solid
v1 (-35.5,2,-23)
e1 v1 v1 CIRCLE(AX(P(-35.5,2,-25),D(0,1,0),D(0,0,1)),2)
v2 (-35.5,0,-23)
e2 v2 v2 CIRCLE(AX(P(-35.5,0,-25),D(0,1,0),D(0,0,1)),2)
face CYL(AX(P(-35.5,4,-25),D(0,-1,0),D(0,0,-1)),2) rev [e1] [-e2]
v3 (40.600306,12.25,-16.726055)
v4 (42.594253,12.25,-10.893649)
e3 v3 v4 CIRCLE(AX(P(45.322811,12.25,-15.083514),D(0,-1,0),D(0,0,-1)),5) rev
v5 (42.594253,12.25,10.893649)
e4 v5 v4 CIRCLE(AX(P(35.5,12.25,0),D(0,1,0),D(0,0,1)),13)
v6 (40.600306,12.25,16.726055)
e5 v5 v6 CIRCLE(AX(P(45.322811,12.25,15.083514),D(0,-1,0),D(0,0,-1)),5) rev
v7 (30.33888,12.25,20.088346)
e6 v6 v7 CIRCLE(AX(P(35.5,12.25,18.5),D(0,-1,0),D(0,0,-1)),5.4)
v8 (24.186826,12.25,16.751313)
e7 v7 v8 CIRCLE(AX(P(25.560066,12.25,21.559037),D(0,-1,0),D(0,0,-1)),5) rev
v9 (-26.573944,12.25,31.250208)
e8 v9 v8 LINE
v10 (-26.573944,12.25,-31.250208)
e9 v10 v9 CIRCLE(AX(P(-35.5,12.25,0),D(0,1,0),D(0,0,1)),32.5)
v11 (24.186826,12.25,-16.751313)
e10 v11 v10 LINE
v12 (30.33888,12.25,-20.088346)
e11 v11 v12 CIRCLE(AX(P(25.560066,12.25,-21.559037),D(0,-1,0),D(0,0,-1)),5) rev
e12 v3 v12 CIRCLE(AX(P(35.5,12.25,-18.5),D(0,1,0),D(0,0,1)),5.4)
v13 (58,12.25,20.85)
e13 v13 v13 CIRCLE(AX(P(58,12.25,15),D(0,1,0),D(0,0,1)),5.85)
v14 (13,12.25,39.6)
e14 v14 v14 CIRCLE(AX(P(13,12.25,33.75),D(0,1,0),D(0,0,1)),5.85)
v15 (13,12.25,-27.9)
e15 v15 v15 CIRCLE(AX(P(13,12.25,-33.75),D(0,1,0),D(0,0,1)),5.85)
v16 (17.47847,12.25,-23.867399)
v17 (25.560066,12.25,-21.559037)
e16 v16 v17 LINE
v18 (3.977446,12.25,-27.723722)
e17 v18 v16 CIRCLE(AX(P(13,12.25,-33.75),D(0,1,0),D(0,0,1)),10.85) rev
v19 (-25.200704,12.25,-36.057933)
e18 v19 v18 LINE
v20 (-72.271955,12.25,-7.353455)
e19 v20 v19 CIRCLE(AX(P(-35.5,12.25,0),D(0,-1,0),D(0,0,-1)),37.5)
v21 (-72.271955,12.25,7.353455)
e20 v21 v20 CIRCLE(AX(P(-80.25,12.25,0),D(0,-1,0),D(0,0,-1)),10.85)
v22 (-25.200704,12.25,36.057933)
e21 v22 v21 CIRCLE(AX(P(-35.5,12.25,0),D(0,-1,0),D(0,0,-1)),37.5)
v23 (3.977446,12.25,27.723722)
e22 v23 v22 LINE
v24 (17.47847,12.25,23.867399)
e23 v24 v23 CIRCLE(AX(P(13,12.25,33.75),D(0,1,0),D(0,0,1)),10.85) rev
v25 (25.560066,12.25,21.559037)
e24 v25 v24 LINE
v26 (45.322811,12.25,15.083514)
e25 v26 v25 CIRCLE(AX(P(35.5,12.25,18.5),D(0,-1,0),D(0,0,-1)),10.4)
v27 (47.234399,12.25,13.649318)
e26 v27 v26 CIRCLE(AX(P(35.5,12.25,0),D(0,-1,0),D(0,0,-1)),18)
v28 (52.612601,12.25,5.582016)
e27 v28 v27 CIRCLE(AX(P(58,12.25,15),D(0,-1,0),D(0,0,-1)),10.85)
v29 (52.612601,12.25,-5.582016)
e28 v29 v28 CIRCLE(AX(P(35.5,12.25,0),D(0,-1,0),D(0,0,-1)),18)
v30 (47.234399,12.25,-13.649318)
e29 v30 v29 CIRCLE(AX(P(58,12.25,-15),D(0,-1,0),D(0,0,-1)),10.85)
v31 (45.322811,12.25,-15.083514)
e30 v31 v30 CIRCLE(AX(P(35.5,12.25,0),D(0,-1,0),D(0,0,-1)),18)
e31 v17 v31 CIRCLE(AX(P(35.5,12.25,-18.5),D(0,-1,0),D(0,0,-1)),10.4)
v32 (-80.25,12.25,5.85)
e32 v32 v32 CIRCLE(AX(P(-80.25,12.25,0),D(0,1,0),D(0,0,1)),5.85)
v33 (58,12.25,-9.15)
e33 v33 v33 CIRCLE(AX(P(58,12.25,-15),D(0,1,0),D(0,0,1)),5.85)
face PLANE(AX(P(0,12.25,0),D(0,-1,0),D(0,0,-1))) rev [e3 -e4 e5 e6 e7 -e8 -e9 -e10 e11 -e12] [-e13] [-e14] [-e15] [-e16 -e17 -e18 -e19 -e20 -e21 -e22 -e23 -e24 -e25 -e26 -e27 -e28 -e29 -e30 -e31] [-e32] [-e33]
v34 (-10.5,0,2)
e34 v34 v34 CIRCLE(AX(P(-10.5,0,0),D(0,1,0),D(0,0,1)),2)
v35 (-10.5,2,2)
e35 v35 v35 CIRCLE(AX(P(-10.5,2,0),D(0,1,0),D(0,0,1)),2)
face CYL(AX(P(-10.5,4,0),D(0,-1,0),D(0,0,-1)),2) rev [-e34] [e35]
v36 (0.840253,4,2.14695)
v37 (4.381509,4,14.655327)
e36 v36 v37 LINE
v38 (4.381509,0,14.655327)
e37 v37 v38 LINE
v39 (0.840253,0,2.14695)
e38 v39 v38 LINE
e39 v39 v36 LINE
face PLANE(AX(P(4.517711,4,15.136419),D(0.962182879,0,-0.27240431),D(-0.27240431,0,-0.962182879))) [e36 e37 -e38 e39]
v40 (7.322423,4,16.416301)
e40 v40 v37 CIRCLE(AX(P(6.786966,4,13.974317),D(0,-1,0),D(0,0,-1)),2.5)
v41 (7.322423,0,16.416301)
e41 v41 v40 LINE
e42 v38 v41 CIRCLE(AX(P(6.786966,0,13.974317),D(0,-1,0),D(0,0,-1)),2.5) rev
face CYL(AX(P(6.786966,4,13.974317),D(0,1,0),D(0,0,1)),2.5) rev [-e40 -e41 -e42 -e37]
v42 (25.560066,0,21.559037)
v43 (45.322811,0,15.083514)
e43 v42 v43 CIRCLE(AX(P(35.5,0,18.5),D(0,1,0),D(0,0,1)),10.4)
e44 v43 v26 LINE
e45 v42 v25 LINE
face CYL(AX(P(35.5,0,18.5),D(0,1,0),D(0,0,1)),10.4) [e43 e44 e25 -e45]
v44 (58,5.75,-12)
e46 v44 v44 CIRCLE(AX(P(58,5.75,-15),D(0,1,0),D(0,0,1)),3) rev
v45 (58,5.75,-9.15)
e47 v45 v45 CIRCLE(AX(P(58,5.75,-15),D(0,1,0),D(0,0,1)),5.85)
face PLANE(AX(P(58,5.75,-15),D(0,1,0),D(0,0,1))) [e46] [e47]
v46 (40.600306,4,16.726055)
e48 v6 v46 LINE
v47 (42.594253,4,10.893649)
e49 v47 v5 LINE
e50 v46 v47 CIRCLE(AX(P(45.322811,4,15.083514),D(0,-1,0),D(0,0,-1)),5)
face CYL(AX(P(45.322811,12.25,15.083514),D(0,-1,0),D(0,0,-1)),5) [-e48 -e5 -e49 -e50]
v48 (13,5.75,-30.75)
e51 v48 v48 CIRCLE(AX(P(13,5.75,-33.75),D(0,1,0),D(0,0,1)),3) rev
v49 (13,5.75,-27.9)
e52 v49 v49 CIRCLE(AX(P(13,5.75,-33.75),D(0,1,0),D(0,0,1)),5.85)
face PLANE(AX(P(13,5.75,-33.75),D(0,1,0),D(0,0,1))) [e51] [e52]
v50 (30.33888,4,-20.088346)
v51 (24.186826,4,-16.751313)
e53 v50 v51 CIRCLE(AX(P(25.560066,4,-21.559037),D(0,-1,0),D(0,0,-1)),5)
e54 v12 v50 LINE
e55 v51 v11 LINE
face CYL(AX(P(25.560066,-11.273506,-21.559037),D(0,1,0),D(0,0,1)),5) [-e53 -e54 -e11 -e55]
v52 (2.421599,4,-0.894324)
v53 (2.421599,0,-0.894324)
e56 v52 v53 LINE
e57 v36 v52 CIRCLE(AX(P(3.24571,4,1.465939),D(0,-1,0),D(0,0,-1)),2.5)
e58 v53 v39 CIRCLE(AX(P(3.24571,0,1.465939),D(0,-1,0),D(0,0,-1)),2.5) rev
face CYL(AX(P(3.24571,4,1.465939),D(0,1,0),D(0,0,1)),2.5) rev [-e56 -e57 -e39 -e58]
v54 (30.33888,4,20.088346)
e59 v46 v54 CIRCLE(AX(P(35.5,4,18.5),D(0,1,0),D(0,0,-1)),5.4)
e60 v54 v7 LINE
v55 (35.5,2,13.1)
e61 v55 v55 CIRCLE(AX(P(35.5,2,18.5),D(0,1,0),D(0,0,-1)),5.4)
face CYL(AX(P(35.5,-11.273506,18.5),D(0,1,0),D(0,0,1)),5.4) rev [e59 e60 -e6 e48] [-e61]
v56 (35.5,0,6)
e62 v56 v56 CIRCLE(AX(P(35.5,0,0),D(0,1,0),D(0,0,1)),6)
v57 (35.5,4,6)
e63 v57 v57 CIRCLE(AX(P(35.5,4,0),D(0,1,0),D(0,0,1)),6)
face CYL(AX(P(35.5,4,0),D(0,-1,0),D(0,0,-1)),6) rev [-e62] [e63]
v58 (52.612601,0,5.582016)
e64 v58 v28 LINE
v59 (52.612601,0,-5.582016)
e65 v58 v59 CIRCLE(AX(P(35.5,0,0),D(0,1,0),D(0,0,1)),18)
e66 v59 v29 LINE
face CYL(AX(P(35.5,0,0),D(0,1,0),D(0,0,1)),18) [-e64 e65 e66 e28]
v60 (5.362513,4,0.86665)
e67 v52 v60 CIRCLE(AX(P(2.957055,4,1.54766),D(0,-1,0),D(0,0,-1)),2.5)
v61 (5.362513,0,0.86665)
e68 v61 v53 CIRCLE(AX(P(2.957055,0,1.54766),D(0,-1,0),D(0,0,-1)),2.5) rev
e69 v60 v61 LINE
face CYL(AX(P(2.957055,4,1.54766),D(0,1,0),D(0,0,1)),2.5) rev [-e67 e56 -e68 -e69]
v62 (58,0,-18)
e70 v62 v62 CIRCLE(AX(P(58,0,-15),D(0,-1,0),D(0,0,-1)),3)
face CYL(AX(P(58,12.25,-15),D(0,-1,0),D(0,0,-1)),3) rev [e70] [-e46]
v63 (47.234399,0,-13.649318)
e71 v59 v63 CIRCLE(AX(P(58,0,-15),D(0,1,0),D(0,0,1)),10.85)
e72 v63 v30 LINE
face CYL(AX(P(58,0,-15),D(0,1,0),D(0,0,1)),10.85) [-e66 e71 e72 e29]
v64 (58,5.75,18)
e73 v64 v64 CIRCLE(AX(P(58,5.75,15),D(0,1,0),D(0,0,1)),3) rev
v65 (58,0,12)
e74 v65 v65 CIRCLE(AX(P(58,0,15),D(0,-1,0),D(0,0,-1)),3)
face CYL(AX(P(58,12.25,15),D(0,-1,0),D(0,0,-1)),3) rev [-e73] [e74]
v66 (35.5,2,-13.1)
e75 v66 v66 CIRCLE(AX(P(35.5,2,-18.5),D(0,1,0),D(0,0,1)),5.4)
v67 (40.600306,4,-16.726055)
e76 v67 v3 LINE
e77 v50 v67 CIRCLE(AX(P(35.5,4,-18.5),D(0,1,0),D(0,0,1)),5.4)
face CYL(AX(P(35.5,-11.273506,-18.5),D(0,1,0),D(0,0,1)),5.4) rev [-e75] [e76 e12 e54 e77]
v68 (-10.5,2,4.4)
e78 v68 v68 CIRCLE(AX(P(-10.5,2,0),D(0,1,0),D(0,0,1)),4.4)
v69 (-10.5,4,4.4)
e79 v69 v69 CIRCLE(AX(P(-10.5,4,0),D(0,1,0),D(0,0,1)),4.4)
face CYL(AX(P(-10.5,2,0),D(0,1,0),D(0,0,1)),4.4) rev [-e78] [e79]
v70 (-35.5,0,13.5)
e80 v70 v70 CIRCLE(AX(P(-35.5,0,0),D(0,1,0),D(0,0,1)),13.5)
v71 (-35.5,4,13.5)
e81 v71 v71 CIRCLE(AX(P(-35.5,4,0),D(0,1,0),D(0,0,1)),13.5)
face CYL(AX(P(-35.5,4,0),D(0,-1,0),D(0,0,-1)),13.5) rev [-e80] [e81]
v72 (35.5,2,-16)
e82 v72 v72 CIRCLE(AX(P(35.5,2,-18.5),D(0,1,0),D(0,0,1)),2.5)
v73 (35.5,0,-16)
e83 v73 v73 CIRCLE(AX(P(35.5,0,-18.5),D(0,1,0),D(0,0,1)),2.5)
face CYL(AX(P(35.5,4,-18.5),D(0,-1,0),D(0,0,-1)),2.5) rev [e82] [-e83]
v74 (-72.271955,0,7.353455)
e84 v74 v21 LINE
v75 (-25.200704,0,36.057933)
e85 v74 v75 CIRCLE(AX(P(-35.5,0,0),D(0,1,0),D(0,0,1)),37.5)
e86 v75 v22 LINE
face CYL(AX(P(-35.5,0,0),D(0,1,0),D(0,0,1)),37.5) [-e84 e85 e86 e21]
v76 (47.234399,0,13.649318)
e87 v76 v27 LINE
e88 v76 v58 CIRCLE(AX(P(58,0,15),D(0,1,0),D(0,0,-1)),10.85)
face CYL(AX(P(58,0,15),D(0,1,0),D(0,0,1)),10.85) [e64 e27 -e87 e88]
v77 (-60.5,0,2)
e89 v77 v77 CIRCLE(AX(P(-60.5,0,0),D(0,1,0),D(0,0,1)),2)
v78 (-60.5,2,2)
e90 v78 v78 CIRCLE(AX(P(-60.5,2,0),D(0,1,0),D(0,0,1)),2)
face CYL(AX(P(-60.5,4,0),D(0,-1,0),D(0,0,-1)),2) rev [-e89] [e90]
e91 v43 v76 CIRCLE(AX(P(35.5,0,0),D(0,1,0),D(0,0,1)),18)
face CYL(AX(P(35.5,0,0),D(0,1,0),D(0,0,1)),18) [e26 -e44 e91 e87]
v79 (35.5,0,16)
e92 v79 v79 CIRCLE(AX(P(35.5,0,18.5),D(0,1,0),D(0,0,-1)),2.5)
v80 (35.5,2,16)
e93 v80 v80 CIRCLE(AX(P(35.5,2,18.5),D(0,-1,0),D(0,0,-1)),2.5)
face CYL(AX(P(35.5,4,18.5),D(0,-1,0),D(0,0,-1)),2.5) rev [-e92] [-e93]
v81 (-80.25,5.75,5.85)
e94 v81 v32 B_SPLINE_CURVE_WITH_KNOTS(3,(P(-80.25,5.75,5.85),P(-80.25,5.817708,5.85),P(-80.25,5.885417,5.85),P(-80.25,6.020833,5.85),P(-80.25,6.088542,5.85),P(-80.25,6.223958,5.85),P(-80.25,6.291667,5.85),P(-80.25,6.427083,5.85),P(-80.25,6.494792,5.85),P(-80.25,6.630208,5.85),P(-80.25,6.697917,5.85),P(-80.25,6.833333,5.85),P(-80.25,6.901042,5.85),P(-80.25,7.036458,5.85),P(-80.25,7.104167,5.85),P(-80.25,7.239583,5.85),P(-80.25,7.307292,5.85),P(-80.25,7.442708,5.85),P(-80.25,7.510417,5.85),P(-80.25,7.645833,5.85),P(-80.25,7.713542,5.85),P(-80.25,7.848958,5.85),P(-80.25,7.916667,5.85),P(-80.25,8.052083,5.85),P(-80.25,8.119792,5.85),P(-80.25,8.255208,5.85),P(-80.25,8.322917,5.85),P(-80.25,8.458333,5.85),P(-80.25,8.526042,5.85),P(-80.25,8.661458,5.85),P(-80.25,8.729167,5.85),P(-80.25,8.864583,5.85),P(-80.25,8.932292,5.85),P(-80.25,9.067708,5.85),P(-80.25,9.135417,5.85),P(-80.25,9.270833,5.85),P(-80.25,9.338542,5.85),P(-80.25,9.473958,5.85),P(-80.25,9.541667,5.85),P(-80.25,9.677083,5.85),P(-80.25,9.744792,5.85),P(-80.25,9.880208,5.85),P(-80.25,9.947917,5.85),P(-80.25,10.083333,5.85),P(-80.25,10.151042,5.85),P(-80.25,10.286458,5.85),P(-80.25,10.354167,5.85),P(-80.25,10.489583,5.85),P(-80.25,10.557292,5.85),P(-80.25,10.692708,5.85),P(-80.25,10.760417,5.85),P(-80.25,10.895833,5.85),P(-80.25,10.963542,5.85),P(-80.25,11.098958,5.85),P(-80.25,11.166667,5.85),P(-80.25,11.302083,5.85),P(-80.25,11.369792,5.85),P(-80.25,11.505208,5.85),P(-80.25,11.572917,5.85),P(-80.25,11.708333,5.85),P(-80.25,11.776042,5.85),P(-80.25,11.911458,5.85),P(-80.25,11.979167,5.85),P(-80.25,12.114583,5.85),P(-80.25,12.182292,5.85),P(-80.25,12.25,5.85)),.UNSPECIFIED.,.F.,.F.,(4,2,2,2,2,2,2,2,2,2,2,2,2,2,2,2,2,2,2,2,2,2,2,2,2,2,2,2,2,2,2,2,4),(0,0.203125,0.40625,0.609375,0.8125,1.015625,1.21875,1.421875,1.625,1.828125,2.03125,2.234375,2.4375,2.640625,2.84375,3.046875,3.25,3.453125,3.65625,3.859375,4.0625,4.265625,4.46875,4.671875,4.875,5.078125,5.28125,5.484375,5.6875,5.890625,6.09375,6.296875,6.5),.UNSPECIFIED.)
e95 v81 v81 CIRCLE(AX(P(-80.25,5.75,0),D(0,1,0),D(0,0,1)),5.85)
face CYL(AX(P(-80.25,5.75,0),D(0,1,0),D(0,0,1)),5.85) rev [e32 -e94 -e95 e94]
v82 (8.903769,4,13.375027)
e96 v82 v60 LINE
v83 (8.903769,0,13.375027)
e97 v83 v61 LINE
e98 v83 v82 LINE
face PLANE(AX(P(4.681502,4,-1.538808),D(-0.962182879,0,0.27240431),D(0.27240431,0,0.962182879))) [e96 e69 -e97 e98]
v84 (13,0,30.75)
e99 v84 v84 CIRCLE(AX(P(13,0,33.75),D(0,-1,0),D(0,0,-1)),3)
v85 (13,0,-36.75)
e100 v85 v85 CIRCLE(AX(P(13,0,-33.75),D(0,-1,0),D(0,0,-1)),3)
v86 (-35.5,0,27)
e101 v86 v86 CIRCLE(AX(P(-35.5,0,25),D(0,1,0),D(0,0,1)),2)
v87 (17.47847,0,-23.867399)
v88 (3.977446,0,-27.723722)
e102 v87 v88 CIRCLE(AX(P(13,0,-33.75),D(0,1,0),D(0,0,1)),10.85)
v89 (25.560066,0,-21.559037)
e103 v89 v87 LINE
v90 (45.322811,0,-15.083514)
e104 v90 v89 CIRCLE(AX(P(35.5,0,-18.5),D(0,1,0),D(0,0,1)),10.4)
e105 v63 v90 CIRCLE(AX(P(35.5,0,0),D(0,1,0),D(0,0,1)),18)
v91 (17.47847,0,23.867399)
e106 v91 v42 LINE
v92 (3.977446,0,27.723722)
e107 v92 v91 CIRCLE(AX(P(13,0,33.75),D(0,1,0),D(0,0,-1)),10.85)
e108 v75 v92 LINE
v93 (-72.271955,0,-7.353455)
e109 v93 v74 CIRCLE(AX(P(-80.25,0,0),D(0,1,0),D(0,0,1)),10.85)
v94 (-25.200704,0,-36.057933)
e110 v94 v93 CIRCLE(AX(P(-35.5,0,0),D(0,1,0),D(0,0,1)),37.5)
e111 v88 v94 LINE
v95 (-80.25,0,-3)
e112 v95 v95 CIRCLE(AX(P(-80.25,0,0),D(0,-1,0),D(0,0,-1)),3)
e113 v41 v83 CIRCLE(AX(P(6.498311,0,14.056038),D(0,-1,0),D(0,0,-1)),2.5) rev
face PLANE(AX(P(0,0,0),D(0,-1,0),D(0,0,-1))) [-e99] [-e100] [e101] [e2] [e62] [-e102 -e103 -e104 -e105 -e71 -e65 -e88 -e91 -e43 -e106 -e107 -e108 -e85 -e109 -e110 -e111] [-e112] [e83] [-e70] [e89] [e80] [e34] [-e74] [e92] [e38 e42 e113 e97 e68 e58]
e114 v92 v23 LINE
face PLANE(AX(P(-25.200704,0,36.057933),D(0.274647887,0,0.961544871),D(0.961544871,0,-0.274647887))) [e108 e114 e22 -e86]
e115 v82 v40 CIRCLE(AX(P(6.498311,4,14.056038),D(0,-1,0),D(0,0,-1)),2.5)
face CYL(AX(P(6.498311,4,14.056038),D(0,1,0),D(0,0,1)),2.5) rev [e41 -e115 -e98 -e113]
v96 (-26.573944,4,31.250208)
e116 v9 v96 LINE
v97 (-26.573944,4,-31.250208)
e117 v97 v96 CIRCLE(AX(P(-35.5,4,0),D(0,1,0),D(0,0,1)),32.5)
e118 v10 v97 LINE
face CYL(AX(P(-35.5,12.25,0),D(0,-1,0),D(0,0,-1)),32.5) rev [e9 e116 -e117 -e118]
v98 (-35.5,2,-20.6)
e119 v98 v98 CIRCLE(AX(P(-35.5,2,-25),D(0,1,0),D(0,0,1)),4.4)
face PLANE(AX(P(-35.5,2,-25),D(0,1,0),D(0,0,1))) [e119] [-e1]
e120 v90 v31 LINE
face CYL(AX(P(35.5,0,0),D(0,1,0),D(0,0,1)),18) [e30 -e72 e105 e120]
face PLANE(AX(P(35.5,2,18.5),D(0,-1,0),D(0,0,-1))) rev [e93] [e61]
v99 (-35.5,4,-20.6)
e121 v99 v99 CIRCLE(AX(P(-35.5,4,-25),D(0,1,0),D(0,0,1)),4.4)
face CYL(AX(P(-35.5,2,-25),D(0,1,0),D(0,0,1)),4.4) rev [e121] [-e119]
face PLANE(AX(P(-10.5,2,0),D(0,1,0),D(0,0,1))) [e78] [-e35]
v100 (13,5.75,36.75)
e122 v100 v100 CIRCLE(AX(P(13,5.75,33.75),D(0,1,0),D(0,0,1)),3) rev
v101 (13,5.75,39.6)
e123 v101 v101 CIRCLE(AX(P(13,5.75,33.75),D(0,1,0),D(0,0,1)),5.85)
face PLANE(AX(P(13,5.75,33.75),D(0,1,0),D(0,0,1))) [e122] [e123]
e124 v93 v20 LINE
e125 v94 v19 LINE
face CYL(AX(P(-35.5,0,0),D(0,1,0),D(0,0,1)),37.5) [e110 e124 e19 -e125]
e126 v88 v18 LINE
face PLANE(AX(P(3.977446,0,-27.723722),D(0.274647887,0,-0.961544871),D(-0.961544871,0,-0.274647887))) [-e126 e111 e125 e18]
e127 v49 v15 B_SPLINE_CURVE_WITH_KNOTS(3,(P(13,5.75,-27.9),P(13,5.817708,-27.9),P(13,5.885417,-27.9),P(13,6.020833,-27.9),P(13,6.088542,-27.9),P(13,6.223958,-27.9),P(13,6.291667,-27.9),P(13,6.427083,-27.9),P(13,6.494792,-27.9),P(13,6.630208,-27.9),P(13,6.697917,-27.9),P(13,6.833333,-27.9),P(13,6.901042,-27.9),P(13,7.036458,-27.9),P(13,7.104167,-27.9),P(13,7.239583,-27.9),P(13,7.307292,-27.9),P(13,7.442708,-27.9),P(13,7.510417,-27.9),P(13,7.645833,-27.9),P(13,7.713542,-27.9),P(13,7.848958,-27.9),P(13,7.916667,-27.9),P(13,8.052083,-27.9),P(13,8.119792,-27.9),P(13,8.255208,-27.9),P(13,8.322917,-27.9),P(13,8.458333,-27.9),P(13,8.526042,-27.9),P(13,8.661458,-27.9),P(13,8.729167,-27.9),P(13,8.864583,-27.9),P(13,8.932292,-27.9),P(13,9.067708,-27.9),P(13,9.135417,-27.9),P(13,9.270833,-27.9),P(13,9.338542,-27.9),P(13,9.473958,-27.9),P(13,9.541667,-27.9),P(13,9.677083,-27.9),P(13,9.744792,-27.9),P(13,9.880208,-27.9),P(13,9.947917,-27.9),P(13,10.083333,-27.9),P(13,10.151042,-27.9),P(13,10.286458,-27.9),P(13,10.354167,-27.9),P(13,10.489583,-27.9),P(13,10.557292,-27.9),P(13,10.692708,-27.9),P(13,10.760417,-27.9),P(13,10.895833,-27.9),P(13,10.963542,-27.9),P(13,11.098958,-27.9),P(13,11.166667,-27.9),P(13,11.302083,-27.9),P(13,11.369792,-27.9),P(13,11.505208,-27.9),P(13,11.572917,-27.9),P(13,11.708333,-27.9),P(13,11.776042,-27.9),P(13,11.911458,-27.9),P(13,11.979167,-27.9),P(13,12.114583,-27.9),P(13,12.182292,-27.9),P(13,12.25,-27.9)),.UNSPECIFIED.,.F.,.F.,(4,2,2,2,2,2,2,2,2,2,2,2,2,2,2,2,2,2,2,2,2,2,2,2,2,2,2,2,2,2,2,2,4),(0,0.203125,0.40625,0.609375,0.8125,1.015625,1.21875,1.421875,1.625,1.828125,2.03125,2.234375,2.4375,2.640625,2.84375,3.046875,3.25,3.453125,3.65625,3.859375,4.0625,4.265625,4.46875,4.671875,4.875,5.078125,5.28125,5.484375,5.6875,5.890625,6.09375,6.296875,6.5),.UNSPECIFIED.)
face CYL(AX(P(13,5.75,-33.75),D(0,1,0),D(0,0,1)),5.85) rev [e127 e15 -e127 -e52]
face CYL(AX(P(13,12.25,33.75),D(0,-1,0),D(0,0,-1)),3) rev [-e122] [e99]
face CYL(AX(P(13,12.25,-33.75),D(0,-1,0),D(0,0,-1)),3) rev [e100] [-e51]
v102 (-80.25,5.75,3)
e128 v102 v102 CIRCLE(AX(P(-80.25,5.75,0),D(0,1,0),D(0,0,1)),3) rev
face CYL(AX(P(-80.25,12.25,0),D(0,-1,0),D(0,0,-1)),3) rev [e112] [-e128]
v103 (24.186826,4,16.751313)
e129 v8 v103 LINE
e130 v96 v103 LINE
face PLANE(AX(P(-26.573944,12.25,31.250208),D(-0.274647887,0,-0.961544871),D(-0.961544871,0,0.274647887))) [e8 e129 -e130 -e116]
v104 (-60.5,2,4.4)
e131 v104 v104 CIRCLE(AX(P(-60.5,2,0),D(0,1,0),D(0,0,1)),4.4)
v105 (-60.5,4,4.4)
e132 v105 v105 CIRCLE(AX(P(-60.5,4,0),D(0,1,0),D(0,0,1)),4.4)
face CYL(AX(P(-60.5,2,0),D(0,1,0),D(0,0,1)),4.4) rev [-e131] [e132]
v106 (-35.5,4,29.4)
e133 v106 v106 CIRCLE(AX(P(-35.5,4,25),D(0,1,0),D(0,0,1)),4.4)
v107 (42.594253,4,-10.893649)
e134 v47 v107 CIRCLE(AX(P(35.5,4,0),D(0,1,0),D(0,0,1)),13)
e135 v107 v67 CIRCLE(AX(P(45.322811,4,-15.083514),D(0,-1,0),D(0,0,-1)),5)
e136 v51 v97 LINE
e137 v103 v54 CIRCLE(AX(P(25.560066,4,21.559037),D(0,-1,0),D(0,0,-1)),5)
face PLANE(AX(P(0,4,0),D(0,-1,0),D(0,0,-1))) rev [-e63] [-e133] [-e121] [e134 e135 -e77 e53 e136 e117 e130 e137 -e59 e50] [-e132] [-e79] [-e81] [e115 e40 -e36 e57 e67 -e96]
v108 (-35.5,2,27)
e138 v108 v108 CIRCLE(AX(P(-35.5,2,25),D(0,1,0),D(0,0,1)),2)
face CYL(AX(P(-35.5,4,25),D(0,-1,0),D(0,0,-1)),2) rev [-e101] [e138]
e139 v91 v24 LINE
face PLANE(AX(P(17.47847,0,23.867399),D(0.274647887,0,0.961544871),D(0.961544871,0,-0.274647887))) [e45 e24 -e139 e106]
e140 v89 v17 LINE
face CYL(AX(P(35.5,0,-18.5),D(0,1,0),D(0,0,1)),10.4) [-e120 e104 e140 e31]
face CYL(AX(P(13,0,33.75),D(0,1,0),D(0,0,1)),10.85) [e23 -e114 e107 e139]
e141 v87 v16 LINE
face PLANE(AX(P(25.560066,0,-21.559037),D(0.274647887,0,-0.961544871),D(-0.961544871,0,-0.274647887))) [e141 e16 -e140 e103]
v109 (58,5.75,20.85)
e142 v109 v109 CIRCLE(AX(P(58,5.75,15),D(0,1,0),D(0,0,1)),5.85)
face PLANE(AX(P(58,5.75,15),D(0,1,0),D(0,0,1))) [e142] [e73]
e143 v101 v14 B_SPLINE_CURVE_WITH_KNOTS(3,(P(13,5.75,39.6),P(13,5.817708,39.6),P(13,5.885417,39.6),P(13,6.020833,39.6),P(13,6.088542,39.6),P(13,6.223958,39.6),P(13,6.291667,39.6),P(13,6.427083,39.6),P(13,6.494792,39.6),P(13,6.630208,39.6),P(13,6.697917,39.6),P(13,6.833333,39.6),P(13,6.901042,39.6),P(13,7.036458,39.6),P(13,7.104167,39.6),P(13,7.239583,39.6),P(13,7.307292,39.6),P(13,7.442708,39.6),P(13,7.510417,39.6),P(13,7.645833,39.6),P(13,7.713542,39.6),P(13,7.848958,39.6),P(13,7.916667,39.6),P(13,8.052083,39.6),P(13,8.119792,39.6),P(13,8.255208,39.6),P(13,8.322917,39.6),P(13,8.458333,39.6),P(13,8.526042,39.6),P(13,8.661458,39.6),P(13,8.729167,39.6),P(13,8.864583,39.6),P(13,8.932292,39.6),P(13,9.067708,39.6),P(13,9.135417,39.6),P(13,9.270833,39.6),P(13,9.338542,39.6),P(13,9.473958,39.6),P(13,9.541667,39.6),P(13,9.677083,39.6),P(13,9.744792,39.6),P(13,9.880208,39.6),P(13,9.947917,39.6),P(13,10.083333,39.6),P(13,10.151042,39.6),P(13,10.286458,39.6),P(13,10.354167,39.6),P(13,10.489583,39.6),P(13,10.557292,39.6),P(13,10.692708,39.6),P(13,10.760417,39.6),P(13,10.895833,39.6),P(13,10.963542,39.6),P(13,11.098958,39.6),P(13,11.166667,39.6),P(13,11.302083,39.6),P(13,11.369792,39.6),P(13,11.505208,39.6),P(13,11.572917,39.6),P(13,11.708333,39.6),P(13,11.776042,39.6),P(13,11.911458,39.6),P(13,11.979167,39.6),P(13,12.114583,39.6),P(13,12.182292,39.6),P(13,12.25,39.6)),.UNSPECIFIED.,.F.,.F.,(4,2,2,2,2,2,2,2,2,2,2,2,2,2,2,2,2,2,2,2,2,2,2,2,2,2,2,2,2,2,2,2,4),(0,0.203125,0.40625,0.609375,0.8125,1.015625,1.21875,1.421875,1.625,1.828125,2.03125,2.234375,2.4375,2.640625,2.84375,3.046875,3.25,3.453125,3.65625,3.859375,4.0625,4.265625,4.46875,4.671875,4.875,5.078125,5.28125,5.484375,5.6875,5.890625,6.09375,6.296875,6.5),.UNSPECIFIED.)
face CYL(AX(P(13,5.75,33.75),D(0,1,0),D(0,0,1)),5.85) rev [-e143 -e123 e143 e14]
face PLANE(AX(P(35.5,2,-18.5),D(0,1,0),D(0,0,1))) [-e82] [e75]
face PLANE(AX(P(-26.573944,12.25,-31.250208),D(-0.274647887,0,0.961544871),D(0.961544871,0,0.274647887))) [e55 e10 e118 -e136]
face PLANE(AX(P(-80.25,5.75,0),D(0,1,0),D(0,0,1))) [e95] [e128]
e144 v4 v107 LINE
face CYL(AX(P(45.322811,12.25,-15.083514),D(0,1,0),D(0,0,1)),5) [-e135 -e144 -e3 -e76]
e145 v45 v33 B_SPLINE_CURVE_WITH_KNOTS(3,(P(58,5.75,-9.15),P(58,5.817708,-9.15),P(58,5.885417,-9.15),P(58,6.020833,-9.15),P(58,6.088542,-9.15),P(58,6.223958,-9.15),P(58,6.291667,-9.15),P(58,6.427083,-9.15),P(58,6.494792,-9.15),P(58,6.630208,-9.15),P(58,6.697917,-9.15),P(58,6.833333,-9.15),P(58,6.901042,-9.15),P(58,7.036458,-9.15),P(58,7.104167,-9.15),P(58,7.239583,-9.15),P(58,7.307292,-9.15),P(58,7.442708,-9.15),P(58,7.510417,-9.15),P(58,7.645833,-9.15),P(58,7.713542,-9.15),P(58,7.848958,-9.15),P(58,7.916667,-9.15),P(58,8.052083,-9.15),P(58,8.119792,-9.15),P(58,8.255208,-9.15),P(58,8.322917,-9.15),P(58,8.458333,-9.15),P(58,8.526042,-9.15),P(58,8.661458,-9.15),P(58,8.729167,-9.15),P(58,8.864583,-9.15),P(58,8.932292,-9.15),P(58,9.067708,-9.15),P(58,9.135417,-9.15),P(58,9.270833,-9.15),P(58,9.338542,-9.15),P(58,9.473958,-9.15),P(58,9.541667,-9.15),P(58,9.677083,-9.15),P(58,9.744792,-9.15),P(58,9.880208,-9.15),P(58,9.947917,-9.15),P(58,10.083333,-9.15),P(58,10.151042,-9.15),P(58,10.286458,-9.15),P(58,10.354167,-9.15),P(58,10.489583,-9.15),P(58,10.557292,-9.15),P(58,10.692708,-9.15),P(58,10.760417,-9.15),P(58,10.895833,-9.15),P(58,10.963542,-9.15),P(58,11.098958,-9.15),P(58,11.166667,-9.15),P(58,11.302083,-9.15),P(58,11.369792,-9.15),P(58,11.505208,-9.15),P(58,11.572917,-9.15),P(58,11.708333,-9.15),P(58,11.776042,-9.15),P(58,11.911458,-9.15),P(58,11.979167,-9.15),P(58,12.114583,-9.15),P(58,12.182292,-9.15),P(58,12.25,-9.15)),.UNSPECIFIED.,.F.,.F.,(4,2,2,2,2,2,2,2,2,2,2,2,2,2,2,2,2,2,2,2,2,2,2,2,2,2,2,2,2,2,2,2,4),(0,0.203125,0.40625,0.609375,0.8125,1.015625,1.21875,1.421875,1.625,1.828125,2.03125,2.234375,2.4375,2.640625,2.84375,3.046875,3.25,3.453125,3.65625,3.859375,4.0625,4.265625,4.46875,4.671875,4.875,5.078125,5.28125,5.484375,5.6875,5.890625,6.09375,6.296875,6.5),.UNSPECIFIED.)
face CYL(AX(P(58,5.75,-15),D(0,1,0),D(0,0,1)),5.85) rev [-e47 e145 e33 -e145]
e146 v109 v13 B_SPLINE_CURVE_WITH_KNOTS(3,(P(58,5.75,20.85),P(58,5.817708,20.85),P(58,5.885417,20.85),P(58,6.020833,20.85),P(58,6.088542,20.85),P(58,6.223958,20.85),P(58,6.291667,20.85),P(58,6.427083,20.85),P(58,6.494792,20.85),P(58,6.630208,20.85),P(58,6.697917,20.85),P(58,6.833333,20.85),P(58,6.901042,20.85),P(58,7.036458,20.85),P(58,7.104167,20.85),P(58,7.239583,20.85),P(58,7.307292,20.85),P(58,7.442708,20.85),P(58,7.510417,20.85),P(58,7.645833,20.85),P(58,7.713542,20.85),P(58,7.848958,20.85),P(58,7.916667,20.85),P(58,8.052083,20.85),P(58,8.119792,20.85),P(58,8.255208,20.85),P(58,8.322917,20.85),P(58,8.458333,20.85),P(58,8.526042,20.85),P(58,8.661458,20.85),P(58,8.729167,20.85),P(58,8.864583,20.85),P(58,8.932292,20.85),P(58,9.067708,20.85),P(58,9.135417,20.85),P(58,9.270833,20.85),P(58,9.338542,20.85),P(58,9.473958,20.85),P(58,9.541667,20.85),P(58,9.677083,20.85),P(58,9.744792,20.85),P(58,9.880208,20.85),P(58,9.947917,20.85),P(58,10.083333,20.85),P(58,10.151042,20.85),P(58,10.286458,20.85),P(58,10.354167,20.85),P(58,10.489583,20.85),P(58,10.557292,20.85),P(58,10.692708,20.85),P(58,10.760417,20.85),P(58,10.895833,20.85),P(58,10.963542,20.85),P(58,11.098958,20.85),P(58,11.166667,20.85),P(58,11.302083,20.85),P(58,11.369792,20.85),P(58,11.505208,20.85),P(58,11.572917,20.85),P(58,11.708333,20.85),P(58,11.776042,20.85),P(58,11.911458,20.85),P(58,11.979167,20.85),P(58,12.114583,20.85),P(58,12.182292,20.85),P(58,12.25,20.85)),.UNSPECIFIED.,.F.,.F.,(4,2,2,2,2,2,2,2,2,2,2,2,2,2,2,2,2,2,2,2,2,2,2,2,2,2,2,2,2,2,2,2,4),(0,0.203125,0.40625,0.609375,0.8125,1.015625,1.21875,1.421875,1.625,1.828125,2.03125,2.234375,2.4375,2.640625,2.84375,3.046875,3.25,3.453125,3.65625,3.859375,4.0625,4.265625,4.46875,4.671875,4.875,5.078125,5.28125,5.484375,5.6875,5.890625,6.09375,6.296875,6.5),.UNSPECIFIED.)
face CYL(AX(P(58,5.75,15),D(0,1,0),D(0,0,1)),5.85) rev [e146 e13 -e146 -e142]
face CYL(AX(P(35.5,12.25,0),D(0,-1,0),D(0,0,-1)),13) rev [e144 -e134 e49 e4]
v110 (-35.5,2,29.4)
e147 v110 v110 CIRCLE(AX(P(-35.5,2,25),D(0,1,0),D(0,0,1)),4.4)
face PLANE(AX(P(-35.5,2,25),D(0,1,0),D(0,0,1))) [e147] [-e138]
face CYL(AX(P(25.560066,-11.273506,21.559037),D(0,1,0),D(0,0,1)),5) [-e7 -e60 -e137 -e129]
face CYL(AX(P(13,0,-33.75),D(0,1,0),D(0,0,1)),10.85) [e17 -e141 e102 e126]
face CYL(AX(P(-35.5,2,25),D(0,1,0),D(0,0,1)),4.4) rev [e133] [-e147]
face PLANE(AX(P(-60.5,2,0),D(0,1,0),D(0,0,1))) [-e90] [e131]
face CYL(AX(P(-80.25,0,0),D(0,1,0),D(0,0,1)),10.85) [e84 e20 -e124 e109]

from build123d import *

# Parameters (mm, degrees)
SKETCH1_W               = 200
SKETCH1_H               = 150
SKETCH1_R               = 6
SKETCH1_R_2             = 13.5
SKETCH1_R_3             = 2
SKETCH1_R_4             = 2.5
BOSS_EXTRUDE1_DEPTH     = 4
SKETCH3_W               = 200
SKETCH3_H               = 150
BOSS_EXTRUDE2_DEPTH     = 8.25
SKETCH6_R               = 5.4
CUT_EXTRUDE2_DEPTH      = 8.25
FILLET1_R               = 2.5
FILLET2_R               = 5
SKETCH2_R               = 4.4
SKETCH2_R_2             = 5.4
CUT_EXTRUDE1_DEPTH      = 2
CUT_EXTRUDE3_DEPTH      = 126.598815828
CUT_EXTRUDE3_DEPTH_BACK = 126.598815828
SKETCH8_R               = 3
SKETCH9_R               = 5.85
CUT_EXTRUDE4_DEPTH      = 6.5
CUT_EXTRUDE5_DEPTH      = 126.598815818
CUT_EXTRUDE5_DEPTH_BACK = 126.598815818
SKETCH12_OUTSIDE_W      = 252.06
SKETCH12_OUTSIDE_H      = 202.06


with BuildPart() as part:
    # Sketch1 → Boss-Extrude1 (new body)
    with BuildSketch(Plane(origin=(0, 0, 0), x_dir=(1, 0, 0), z_dir=(0, 1, 0))):
        Rectangle(SKETCH1_W, SKETCH1_H)
        with Locations(Location((35.5, 0, 0), (0, 0, 270))):
            Circle(SKETCH1_R, mode=Mode.SUBTRACT)
        with Locations(Location((-35.5, 0, 0), (0, 0, 270))):
            Circle(SKETCH1_R_2, mode=Mode.SUBTRACT)
        with Locations(Location((-60.5, 0, 0), (0, 0, 270))):
            Circle(SKETCH1_R_3, mode=Mode.SUBTRACT)
        with Locations(Location((-35.5, 25, 0), (0, 0, 270))):
            Circle(SKETCH1_R_3, mode=Mode.SUBTRACT)
        with Locations(Location((-10.5, 0, 0), (0, 0, 270))):
            Circle(SKETCH1_R_3, mode=Mode.SUBTRACT)
        with Locations(Location((-35.5, -25, 0), (0, 0, 270))):
            Circle(SKETCH1_R_3, mode=Mode.SUBTRACT)
        with Locations(Location((35.5, 18.5, 0), (0, 0, 270))):
            Circle(SKETCH1_R_4, mode=Mode.SUBTRACT)
        with Locations(Location((35.5, -18.5, 0), (0, 0, 90))):
            Circle(SKETCH1_R_4, mode=Mode.SUBTRACT)
        Polygon((4.517711304, -15.136418767), (0.159242352, 0.258507293), (4.681501882, 1.538807548), (9.039970835, -13.856118512), (9.584779454, -15.78048427), (5.062519924, -17.060784524), align=None, mode=Mode.SUBTRACT)
    extrude(amount=BOSS_EXTRUDE1_DEPTH)

    # Sketch3 → Boss-Extrude2 (add)
    with BuildSketch(Plane(origin=(0, 4, 0), x_dir=(1, 0, 0), z_dir=(0, 1, 0))):
        Rectangle(SKETCH3_W, SKETCH3_H)
        with BuildLine():
            Line((-26.573943662, 31.250208291), (39.070422535, 12.500083317))
            ThreePointArc((39.070422535, 12.500083317), (48.5, 0), (39.070422535, -12.500083317))
            Line((39.070422535, -12.500083317), (-26.573943662, -31.250208291))
            ThreePointArc((-26.573943662, -31.250208291), (-68, 0), (-26.573943662, 31.250208291))
        make_face(mode=Mode.SUBTRACT)
    extrude(amount=BOSS_EXTRUDE2_DEPTH)

    # Sketch6 → Cut-Extrude2 (cut)
    with BuildSketch(Plane(origin=(0, 12.25, 0), x_dir=(1, 0, 0), z_dir=(0, 1, 0))):
        with Locations((35.5, 18.5)):
            Circle(SKETCH6_R)
        with Locations((35.5, -18.5)):
            Circle(SKETCH6_R)
    extrude(amount=-CUT_EXTRUDE2_DEPTH, mode=Mode.SUBTRACT)

    # Fillet1
    # the kernel refuses this fillet: 2.5 mm, written as the material it adds along each edge
    with BuildSketch(Plane(origin=(9.584779454, 0, 15.78048427), x_dir=(-0.9621828787440704, 0, 0.2724043095323078), z_dir=(0, 1, 0)), Plane(origin=(5.062519924, 0, 17.060784524), x_dir=(-0.2724043095323296, 0, -0.9621828787440644), z_dir=(0, 1, 0)), Plane(origin=(4.681501882, 0, -1.538807548), x_dir=(0.2724043095323091, 0, 0.96218287874407), z_dir=(0, 1, 0))) as fillet1_piece_1:
        with BuildLine():
            CenterArc((FILLET1_R, -FILLET1_R), FILLET1_R, 90, 90)
            Line((0, -FILLET1_R), (0, 0))
            Line((0, 0), (FILLET1_R, 0))
        make_face()
    extrude(amount=4)
    with BuildSketch(Plane(origin=(0.159242352, 0, -0.258507293), x_dir=(0.272404309532306, 0, 0.962182878744071), z_dir=(0, 1, 0))) as fillet1_piece_2:
        with BuildLine():
            CenterArc((FILLET1_R, FILLET1_R), FILLET1_R, 180, 90)
            Line((0, FILLET1_R), (0, 0))
            Line((0, 0), (FILLET1_R, 0))
        make_face()
    extrude(amount=4)

    # Fillet2
    fillet2_edges = [part.edges().sort_by_distance(p)[0] for p in [
        (31.784909874, 8.125, 14.581058133),
        (36.584743308, 8.125, 13.210072594),
        (36.584743308, 8.125, -13.210072594),
        (31.784909874, 8.125, -14.581058133),
    ]]
    fillet(fillet2_edges, radius=FILLET2_R)

    # Sketch2 → Cut-Extrude1 (cut)
    with BuildSketch(Plane(origin=(0, 4, 0), x_dir=(1, 0, 0), z_dir=(0, 1, 0))):
        with Locations(Location((-35.5, 25, 0), (0, 0, 270))):
            Circle(SKETCH2_R)
        with Locations(Location((-10.5, 0, 0), (0, 0, 270))):
            Circle(SKETCH2_R)
        with Locations(Location((-35.5, -25, 0), (0, 0, 270))):
            Circle(SKETCH2_R)
        with Locations(Location((-60.5, 0, 0), (0, 0, 270))):
            Circle(SKETCH2_R)
        with Locations(Location((35.5, 18.5, 0), (0, 0, 270))):
            Circle(SKETCH2_R_2)
        with Locations(Location((35.5, -18.5, 0), (0, 0, 197.105868404))):
            Circle(SKETCH2_R_2)
    extrude(amount=-CUT_EXTRUDE1_DEPTH, mode=Mode.SUBTRACT)

    # Sketch8 → Cut-Extrude3 (cut, two sides: drawn at the far end of the back side and taken through both)
    with BuildSketch(Plane.XZ.offset(-CUT_EXTRUDE3_DEPTH_BACK)):
        with Locations(Location((-80.25, 0, 0), (0, 0, 270))):
            Circle(SKETCH8_R)
        with Locations(Location((58, 15, 0), (0, 0, 270))):
            Circle(SKETCH8_R)
        with Locations(Location((58, -15, 0), (0, 0, 270))):
            Circle(SKETCH8_R)
        with Locations(Location((13, 33.75, 0), (0, 0, 270))):
            Circle(SKETCH8_R)
        with Locations(Location((13, -33.75, 0), (0, 0, 270))):
            Circle(SKETCH8_R)
    extrude(amount=CUT_EXTRUDE3_DEPTH + CUT_EXTRUDE3_DEPTH_BACK, mode=Mode.SUBTRACT)

    # Sketch9 → Cut-Extrude4 (cut)
    with BuildSketch(Plane(origin=(0, 12.25, 0), x_dir=(1, 0, 0), z_dir=(0, 1, 0))):
        with Locations(Location((13, 33.75, 0), (0, 0, 270))):
            Circle(SKETCH9_R)
        with Locations(Location((58, 15, 0), (0, 0, 270))):
            Circle(SKETCH9_R)
        with Locations(Location((58, -15, 0), (0, 0, 270))):
            Circle(SKETCH9_R)
        with Locations(Location((13, -33.75, 0), (0, 0, 270))):
            Circle(SKETCH9_R)
        with Locations(Location((-80.25, 0, 0), (0, 0, 270))):
            Circle(SKETCH9_R)
    extrude(amount=-CUT_EXTRUDE4_DEPTH, mode=Mode.SUBTRACT)

    # Sketch12 outside → Cut-Extrude5 (cut, two sides: drawn at the far end of the back side and taken through both)
    with BuildSketch(Plane(origin=(0, 12.25, 0), x_dir=(1, 0, 0), z_dir=(0, 1, 0)).offset(-CUT_EXTRUDE5_DEPTH_BACK)):
        Rectangle(SKETCH12_OUTSIDE_W, SKETCH12_OUTSIDE_H)
        with BuildLine():
            Line((3.977446341, 27.723722089), (-25.200704225, 36.057932644))
            ThreePointArc((-25.200704225, 36.057932644), (-55.024015532, 32.016602217), (-72.271955307, 7.353455166))
            ThreePointArc((-72.271955307, 7.353455166), (-91.1, 0), (-72.271955307, -7.353455166))
            ThreePointArc((-72.271955307, -7.353455166), (-55.024015532, -32.016602217), (-25.200704225, -36.057932644))
            Line((-25.200704225, -36.057932644), (3.977446341, -27.723722089))
            ThreePointArc((3.977446341, -27.723722089), (15.979929577, -44.182761845), (17.478470354, -23.867398961))
            Line((17.478470354, -23.867398961), (25.56006591, -21.559037476))
            ThreePointArc((25.56006591, -21.559037476), (38.738291539, -28.382988815), (45.322811211, -15.083513514))
            ThreePointArc((45.322811211, -15.083513514), (46.302433123, -14.398174837), (47.234399361, -13.649317625))
            ThreePointArc((47.234399361, -13.649317625), (67.027745694, -21.018497129), (52.612600639, -5.582015708))
            ThreePointArc((52.612600639, -5.582015708), (53.5, 0), (52.612600639, 5.582015708))
            ThreePointArc((52.612600639, 5.582015708), (67.027745694, 21.018497129), (47.234399361, 13.649317625))
            ThreePointArc((47.234399361, 13.649317625), (46.302433123, 14.398174837), (45.322811211, 15.083513514))
            ThreePointArc((45.322811211, 15.083513514), (38.738291539, 28.382988815), (25.56006591, 21.559037476))
            Line((25.56006591, 21.559037476), (17.478470354, 23.867398961))
            ThreePointArc((17.478470354, 23.867398961), (15.979929577, 44.182761845), (3.977446341, 27.723722089))
        make_face(mode=Mode.SUBTRACT)
    extrude(amount=CUT_EXTRUDE5_DEPTH + CUT_EXTRUDE5_DEPTH_BACK, mode=Mode.SUBTRACT)


solid = part.part
